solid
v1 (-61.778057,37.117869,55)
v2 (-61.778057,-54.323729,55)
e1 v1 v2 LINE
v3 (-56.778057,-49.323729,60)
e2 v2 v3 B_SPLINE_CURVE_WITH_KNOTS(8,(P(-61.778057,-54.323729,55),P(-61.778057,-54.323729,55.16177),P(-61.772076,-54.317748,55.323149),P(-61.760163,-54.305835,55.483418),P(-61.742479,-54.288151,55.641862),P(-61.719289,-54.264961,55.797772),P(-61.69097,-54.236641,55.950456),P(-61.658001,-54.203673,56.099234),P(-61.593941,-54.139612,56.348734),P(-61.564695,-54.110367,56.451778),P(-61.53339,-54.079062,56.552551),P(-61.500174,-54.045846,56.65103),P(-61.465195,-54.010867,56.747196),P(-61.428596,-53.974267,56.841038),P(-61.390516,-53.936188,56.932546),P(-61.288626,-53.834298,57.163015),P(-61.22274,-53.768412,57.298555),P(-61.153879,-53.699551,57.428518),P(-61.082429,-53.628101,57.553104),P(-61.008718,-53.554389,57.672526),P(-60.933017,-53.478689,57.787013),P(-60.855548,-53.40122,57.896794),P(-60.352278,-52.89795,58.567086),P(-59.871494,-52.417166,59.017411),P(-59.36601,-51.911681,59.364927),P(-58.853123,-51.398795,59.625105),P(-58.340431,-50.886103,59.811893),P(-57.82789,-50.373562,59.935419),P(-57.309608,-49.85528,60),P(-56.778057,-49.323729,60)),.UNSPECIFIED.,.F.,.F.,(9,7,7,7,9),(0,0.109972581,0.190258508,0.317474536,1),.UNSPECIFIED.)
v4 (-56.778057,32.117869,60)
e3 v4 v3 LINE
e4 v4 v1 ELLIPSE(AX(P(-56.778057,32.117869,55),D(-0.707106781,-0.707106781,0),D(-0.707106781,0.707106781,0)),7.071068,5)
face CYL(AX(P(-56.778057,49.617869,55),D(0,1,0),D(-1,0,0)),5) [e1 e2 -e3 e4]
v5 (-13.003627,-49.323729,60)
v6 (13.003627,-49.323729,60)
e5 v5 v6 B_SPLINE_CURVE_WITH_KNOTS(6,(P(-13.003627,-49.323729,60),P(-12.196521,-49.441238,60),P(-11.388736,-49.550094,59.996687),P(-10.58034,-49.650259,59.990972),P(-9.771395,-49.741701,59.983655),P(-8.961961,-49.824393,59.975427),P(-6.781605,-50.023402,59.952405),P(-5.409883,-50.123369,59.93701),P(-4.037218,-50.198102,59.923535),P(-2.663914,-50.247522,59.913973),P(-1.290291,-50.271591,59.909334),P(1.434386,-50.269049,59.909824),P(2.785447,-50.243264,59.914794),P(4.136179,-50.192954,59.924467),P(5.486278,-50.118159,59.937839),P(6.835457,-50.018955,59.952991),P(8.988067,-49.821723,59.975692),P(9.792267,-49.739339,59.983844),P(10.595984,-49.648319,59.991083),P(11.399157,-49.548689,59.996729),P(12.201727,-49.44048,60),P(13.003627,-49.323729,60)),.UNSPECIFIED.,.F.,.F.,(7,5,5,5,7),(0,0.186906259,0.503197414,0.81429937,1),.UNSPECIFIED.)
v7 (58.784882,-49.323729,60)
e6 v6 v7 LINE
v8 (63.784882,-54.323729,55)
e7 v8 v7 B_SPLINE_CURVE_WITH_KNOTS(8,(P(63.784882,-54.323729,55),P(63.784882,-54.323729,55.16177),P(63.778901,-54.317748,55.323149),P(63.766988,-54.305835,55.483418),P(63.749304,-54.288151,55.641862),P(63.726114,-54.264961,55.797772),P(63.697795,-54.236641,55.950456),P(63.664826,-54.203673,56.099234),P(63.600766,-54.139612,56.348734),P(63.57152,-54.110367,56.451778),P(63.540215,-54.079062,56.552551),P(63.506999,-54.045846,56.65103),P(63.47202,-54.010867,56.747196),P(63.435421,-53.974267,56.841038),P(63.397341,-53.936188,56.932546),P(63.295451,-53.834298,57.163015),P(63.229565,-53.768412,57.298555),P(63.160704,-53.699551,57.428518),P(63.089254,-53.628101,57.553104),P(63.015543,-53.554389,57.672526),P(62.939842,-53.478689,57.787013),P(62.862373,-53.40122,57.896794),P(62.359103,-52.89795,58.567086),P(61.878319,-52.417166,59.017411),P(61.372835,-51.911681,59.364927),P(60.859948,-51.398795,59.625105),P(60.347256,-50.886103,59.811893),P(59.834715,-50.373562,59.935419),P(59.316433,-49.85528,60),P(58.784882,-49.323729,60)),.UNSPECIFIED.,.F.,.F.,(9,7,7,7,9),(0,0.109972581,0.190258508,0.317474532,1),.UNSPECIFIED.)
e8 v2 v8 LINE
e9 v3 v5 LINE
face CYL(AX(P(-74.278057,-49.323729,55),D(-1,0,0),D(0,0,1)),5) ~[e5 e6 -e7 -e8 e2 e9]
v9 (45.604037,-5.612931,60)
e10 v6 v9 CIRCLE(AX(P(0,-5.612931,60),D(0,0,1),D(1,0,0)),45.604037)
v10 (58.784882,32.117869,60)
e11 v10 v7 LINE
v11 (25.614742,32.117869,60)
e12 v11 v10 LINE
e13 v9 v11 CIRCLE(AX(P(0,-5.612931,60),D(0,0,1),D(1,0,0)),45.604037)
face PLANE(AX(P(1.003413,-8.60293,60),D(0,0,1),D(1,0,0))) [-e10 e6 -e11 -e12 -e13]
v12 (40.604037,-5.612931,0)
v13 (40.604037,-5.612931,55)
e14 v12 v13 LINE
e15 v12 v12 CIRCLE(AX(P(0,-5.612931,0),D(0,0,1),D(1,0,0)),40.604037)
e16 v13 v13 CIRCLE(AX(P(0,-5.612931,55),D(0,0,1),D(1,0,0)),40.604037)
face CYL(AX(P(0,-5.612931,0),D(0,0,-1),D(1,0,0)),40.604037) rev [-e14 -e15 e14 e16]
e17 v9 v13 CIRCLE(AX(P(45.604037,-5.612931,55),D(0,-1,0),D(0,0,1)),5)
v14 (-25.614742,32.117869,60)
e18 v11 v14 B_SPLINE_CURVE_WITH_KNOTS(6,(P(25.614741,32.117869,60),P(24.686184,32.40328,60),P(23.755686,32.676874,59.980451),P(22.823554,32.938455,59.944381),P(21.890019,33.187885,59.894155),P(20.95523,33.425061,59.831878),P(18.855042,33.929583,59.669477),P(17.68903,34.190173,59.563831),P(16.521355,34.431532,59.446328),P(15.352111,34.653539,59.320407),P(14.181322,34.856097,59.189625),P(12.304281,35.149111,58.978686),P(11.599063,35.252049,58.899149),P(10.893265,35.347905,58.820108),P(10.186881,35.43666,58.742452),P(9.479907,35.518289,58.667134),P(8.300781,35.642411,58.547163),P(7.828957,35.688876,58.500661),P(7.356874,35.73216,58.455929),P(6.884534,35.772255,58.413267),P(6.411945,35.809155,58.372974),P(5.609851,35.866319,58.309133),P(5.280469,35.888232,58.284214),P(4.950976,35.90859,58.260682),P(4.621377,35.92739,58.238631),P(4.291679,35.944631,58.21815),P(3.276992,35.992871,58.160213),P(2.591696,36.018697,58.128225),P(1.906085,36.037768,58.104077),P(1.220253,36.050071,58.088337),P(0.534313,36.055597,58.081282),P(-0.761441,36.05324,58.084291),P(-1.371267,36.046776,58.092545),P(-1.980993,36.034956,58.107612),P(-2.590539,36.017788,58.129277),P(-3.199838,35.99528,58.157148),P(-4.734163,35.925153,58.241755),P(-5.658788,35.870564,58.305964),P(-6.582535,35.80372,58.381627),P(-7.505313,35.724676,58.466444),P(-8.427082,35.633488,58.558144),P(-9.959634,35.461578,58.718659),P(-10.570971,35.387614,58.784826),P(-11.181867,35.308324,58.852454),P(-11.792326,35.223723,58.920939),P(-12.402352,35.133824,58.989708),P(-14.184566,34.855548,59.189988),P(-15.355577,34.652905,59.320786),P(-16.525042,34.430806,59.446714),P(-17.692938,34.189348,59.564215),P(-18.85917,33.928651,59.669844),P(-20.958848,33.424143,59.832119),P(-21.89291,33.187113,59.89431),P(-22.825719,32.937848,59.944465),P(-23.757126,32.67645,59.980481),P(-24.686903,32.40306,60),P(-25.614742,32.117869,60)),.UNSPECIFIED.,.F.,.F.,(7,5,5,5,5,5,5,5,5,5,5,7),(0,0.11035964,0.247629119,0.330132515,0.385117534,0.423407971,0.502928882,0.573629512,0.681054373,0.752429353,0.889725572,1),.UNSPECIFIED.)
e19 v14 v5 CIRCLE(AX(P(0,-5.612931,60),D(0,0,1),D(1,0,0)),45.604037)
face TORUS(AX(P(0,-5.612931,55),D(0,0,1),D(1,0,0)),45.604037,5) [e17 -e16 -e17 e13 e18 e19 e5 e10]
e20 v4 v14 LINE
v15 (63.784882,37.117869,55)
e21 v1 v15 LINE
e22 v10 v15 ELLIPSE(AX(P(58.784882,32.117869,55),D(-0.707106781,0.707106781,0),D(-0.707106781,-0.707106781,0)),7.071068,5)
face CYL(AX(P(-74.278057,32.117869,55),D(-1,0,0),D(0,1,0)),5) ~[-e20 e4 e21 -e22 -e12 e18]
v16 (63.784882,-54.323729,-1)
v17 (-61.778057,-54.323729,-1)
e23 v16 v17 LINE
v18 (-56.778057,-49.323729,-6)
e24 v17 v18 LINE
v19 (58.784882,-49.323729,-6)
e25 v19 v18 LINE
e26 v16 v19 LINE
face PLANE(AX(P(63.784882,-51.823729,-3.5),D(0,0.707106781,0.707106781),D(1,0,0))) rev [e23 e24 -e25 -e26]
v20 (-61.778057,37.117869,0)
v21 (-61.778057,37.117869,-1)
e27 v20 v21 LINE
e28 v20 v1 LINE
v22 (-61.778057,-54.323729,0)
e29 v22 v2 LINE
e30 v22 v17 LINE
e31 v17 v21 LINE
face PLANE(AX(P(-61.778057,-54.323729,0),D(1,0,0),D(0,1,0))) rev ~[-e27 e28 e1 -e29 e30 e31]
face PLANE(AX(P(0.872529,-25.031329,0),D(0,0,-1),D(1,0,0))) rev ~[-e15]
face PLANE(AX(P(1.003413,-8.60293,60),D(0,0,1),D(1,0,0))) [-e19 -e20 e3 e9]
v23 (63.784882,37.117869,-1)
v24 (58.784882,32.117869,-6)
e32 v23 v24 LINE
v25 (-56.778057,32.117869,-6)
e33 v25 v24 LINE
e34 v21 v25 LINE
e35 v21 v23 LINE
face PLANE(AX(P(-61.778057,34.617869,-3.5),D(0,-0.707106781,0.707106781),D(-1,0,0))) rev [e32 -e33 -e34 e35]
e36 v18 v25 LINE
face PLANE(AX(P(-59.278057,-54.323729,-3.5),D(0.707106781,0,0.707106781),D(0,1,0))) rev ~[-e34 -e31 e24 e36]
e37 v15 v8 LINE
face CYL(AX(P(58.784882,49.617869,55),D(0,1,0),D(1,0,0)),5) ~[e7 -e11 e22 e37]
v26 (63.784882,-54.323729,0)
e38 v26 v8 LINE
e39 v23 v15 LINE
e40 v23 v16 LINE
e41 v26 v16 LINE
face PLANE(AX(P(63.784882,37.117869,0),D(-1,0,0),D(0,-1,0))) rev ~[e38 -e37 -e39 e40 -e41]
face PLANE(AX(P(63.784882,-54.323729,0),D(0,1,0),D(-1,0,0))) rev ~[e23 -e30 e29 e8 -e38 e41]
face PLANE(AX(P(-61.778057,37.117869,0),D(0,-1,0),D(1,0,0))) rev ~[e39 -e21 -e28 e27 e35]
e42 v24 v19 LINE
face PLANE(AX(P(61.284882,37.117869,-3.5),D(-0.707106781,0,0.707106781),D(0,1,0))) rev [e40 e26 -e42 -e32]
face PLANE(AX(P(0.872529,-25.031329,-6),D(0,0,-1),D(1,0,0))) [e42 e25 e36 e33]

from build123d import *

# Parameters (mm, degrees)
F0_W        = 125.5629397929
F0_H        = 91.4415977895
F0_R        = 40.6040371895
F1_DEPTH    = 60
F2_W        = 118.2770989835
F2_H        = 87.5040702522
F3_DEPTH    = 6
F4_T1_DEPTH = 150.5629397929
F4_T3_DEPTH = 116.4415977895
F5_SIZE     = 5


# Not quite as in the source:
# - a fillet or chamfer that OpenCascade refuses, or shapes differently, is made with other operations: its cross-section is extruded or revolved along the edge and cut away or added


with BuildPart() as f1:
    # F0 (on Top) → F1 (new body)
    with BuildSketch(Plane.XY):
        with Locations((1.0034125298, -8.6029302329)):
            Rectangle(F0_W, F0_H)
        with Locations((0, -5.6129307486)):
            Circle(F0_R, mode=Mode.SUBTRACT)
    extrude(amount=F1_DEPTH)

    # F2 (on face) → F3 (join)
    with BuildSketch(Plane(origin=(0, 0, 0), x_dir=(1, 0, 0), z_dir=(0, 0, -1))):
        Polygon((63.7848824263, -37.1178686619), (63.7848824263, 54.3237291276), (-61.7780573666, 54.3237291276), (-61.7780573666, -37.1178686619), (-58.5906021297, -37.1178686619), (-58.5906021297, 50.3862015903), (59.6864968538, 50.3862015903), (59.6864968538, -37.1178686619), align=None)
        with Locations((0.5479473621, 6.6341664642)):
            Rectangle(F2_W, F2_H)
    extrude(amount=F3_DEPTH)

    # F4: fillet of radius 5 on 5 edges, made by hand

    # F4_s2 → F4_t1 (cut)
    with BuildSketch(Plane.YZ.offset(-74.2780573666)):
        with BuildLine():
            ThreePointArc((37.1178686619, 55), (35.6534025678, 58.5355339059), (32.1178686619, 60))
            Line((32.1178686619, 60), (37.1178686619, 60))
            Line((37.1178686619, 60), (37.1178686619, 55))
        make_face()
        with BuildLine():
            ThreePointArc((-49.3237291276, 60), (-52.8592630336, 58.5355339059), (-54.3237291276, 55))
            Line((-54.3237291276, 55), (-54.3237291276, 60))
            Line((-54.3237291276, 60), (-49.3237291276, 60))
        make_face()
    extrude(amount=F4_T1_DEPTH, mode=Mode.SUBTRACT)

    # F4_s4 → F4_t3 (cut)
    with BuildSketch(Plane.XZ.offset(-49.6178686619)):
        with BuildLine():
            ThreePointArc((63.7848824263, 55), (62.3204163322, 58.5355339059), (58.7848824263, 60))
            Line((58.7848824263, 60), (63.7848824263, 60))
            Line((63.7848824263, 60), (63.7848824263, 55))
        make_face()
        with BuildLine():
            ThreePointArc((-61.7780573666, 55), (-60.3135912725, 58.5355339059), (-56.7780573666, 60))
            Line((-56.7780573666, 60), (-61.7780573666, 60))
            Line((-61.7780573666, 60), (-61.7780573666, 55))
        make_face()
    extrude(amount=F4_T3_DEPTH, mode=Mode.SUBTRACT)

    # F4_s5 → F4_t6 (revolve, cut)
    with BuildSketch(Plane.XZ.offset(5.6129307486)):
        with BuildLine():
            ThreePointArc((45.6040371895, 60), (42.0685032836, 58.5355339059), (40.6040371895, 55))
            Line((40.6040371895, 55), (40.6040371895, 60))
            Line((40.6040371895, 60), (45.6040371895, 60))
        make_face()
    revolve(axis=Axis((0, -5.6129307486, 60), (0, 0, 1)), mode=Mode.SUBTRACT)

    # F5
    f5_edges = [f1.edges().sort_by_distance(p)[0] for p in [
        (1.003413, 37.117869, -6),
        (63.784882, -8.60293, -6),
        (1.003413, -54.323729, -6),
        (-61.778057, -8.60293, -6),
    ]]
    chamfer(f5_edges, length=F5_SIZE)


solid = f1.part
